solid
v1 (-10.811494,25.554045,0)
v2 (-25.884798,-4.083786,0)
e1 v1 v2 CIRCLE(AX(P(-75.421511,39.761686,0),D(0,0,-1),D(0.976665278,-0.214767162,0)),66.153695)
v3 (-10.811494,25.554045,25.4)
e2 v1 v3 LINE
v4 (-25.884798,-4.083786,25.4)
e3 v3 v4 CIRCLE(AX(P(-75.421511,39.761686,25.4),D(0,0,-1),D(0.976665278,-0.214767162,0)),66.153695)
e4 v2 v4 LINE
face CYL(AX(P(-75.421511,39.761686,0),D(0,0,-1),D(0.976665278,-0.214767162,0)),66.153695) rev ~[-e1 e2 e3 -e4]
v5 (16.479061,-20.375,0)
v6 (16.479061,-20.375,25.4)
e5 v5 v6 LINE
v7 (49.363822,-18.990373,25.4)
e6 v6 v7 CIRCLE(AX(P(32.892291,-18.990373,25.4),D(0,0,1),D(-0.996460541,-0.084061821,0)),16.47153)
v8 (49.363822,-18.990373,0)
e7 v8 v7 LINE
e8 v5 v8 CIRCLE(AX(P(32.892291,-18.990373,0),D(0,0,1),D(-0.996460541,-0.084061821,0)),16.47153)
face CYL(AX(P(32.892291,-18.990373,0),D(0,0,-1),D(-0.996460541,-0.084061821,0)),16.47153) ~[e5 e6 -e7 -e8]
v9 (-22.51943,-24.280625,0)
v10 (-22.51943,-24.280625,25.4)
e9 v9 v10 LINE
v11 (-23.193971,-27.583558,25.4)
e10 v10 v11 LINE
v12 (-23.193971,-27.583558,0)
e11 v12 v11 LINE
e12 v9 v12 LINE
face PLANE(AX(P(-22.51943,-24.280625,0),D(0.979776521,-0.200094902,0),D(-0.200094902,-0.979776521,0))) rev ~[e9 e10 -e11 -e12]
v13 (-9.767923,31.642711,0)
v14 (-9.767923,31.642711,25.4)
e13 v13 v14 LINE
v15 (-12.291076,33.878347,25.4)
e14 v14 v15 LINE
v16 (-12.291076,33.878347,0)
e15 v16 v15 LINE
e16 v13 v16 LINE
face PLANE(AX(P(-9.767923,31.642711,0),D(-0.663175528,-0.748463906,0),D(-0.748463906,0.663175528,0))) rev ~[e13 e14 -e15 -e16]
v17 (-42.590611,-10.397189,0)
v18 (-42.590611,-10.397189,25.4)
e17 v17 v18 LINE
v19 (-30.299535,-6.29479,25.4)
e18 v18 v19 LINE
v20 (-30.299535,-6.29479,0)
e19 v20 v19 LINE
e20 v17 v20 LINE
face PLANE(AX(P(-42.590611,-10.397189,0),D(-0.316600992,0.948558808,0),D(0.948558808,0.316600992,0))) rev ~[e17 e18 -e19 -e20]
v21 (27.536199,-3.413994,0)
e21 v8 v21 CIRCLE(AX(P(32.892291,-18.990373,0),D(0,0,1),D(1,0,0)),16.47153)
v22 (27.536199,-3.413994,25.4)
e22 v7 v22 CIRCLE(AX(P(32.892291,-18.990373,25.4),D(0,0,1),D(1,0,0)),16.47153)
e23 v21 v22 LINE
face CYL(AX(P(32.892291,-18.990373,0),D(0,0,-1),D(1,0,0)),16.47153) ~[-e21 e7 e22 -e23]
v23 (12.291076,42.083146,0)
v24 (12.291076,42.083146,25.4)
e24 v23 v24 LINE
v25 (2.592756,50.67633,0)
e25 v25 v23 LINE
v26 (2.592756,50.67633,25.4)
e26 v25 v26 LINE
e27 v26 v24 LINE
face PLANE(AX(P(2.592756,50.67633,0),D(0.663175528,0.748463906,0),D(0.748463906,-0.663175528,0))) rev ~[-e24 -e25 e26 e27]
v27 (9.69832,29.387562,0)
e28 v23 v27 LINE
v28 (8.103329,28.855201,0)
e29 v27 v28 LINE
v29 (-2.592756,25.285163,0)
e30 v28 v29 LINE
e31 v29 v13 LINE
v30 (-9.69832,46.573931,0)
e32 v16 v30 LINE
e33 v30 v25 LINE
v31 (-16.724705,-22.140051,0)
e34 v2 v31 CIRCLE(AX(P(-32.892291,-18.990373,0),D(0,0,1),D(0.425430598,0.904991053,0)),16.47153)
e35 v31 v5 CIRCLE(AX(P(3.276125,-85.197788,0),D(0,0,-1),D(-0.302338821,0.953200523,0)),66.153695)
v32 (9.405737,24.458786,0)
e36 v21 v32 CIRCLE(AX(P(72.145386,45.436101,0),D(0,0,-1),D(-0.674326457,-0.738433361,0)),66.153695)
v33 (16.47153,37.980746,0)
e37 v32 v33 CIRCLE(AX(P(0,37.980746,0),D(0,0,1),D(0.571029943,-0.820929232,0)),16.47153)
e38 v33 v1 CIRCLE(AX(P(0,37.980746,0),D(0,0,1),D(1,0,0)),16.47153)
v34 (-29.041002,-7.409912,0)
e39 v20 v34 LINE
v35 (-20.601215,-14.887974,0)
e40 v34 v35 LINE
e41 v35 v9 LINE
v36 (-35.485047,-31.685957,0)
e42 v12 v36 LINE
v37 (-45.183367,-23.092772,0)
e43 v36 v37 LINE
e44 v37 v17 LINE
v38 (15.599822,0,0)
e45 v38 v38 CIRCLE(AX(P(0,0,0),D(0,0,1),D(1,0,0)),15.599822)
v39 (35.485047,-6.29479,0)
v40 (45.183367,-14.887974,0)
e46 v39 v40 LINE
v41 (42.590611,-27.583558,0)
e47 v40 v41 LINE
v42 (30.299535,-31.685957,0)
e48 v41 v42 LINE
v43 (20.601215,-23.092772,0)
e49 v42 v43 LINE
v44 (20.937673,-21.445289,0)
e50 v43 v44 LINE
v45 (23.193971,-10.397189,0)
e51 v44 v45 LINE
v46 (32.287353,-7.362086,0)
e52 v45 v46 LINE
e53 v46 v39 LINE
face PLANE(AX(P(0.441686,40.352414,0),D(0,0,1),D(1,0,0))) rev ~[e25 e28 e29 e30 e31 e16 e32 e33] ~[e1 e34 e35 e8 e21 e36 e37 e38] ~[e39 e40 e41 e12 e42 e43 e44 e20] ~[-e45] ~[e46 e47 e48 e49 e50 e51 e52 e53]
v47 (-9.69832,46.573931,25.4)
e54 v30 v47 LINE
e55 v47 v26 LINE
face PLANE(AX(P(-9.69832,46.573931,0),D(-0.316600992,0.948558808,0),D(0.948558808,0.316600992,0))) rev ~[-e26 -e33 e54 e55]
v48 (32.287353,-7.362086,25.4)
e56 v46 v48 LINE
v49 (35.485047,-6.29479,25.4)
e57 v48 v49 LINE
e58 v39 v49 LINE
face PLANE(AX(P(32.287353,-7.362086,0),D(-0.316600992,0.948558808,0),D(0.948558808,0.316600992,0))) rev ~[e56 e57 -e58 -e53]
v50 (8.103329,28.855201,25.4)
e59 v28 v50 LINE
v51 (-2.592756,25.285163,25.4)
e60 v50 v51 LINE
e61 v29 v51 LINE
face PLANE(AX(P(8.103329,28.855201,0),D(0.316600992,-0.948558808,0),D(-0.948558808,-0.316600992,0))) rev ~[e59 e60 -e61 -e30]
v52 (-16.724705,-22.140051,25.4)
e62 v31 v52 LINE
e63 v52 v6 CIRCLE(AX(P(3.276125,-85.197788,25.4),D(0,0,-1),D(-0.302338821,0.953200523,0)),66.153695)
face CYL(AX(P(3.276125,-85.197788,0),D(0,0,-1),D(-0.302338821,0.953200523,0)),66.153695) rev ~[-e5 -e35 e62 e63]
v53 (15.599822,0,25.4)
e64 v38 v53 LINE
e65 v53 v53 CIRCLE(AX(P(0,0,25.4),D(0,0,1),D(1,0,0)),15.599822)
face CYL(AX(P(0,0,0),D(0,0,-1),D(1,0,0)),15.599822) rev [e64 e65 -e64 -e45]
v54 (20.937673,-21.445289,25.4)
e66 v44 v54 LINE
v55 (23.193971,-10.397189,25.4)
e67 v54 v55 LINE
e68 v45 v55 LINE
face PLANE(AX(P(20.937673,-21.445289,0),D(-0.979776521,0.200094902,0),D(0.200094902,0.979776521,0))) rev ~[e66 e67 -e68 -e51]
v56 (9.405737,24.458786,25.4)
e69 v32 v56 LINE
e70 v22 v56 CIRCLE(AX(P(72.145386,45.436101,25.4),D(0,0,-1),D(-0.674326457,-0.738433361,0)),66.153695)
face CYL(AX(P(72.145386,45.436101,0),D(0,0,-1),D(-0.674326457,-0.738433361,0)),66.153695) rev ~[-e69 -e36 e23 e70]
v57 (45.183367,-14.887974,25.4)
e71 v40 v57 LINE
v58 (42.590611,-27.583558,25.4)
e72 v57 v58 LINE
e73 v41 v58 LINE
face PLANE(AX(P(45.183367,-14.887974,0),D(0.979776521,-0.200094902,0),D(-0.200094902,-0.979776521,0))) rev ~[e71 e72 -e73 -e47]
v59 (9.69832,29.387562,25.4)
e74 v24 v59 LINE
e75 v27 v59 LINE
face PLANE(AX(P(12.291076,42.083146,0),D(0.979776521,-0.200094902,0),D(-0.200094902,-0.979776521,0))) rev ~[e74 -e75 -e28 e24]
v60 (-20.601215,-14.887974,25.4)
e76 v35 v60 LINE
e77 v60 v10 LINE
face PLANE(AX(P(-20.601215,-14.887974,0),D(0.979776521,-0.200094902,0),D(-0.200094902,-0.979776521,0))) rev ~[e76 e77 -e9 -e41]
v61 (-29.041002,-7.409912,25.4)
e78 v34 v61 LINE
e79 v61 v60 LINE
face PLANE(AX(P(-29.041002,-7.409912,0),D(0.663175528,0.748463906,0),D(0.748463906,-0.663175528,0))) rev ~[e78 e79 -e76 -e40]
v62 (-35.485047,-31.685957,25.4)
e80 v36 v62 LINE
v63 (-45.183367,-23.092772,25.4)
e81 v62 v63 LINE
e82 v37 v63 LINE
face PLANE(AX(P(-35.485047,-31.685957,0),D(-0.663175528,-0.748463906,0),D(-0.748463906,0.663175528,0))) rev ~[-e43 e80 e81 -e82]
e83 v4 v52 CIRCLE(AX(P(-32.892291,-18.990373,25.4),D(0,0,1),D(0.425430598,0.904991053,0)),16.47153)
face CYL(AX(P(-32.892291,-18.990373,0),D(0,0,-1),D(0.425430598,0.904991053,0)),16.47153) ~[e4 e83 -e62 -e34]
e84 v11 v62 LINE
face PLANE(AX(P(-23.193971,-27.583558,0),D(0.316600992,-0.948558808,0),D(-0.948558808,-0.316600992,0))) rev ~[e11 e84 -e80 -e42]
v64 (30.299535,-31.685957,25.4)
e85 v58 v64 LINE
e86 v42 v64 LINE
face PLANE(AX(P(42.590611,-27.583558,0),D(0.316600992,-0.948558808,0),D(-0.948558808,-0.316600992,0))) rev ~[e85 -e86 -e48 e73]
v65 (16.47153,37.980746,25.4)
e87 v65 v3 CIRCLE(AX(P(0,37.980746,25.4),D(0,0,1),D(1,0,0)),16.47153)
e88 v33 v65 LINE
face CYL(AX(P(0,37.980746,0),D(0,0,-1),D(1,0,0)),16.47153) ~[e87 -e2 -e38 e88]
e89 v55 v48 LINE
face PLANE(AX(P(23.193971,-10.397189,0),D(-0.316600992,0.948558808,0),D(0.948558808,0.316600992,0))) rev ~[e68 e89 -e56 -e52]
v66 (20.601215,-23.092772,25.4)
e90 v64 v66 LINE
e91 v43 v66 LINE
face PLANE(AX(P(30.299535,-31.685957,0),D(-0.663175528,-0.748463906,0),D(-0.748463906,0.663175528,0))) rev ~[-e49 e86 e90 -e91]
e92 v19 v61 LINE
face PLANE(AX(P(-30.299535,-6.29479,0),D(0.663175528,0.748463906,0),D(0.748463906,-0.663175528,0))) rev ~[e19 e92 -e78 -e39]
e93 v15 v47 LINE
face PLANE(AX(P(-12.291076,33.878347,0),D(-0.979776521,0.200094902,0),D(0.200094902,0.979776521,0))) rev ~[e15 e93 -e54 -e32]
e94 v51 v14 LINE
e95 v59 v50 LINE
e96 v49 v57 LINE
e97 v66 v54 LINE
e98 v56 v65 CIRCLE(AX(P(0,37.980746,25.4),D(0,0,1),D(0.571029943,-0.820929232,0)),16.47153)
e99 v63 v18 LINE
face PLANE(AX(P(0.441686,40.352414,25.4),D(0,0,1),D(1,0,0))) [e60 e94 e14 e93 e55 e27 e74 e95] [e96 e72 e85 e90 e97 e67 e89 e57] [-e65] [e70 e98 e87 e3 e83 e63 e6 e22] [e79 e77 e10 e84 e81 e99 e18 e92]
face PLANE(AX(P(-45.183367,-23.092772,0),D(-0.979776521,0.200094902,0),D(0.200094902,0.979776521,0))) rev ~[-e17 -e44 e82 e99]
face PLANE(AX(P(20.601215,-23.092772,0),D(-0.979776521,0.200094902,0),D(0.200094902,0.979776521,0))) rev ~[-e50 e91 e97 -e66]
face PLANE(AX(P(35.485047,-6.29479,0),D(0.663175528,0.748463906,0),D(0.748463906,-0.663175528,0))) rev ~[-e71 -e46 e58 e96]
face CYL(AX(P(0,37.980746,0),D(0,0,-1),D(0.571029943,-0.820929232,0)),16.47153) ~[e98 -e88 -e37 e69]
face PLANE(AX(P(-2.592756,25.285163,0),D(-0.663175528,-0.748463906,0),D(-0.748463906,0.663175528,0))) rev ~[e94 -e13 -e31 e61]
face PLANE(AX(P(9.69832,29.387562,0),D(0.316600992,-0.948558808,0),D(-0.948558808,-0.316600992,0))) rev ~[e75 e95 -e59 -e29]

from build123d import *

# Parameters (mm, degrees)
F0_R     = 15.5998218224
F1_DEPTH = 25.4


# Not quite as in the source:
# - a feature of the source that left no trace in its solid (it failed there, or was rolled back) is left out


with BuildPart() as f1:
    # F0 (on Top) → F1 (new body)
    with BuildSketch(Plane.XY):
        with BuildLine():
            Line((-9.7679234278, 31.6427110991), (-12.2910759721, 33.8783473239))
            Line((-12.2910759721, 33.8783473239), (-9.6983198699, 46.5739309325))
            Line((-9.6983198699, 46.5739309325), (2.5927561023, 50.6763300865))
            Line((2.5927561023, 50.6763300865), (12.2910759721, 42.0831456318))
            Line((12.2910759721, 42.0831456318), (9.6983198699, 29.3875620231))
            Line((9.6983198699, 29.3875620231), (8.1033290175, 28.8552010534))
            ThreePointArc((8.1033290175, 28.8552010534), (8.7164308394, 26.6457057993), (9.4057371171, 24.4587855955))
            ThreePointArc((9.4057371171, 24.4587855955), (14.5985992918, 30.3523642419), (16.4715304941, 37.9807464778))
            ThreePointArc((16.4715304941, 37.9807464778), (-6.8274979981, 52.9706293294), (-10.8114943571, 25.5540451221))
            ThreePointArc((-10.8114943571, 25.5540451221), (-10.2185999519, 28.5861903467), (-9.7679234278, 31.6427110991))
        make_face()
        with BuildLine():
            Line((-2.5927561023, 25.2851628692), (-9.7679234278, 31.6427110991))
            ThreePointArc((-9.7679234278, 31.6427110991), (-10.2185999519, 28.5861903467), (-10.8114943571, 25.5540451221))
            ThreePointArc((-10.8114943571, 25.5540451221), (-0.8910312632, 21.5333339121), (9.4057371171, 24.4587855955))
            ThreePointArc((9.4057371171, 24.4587855955), (8.7164308394, 26.6457057993), (8.1033290175, 28.8552010534))
            Line((8.1033290175, 28.8552010534), (-2.5927561023, 25.2851628692))
        make_face()
        with BuildLine():
            ThreePointArc((9.4057371171, 24.4587855955), (-0.8910312632, 21.5333339121), (-10.8114943571, 25.5540451221))
            ThreePointArc((-10.8114943571, 25.5540451221), (-16.4556801257, 9.772653233), (-25.88479823, -4.083785513))
            ThreePointArc((-25.88479823, -4.083785513), (-27.4340735437, -5.7742023624), (-29.0410016523, -7.4099117424))
            Line((-29.0410016523, -7.4099117424), (-20.6012153324, -14.887974085))
            Line((-20.6012153324, -14.887974085), (-22.5194299425, -24.2806253802))
            ThreePointArc((-22.5194299425, -24.2806253802), (-19.6470670617, -23.1426623228), (-16.7247050666, -22.1400513271))
            ThreePointArc((-16.7247050666, -22.1400513271), (-0.2355258993, -19.1373636419), (16.4790611129, -20.3750000825))
            ThreePointArc((16.4790611129, -20.3750000825), (19.0939298277, -9.9950112466), (27.5361994237, -3.4139937949))
            ThreePointArc((27.5361994237, -3.4139937949), (16.691206025, 9.3647104089), (9.4057371171, 24.4587855955))
        make_face()
        Circle(F0_R, mode=Mode.SUBTRACT)
        with BuildLine():
            ThreePointArc((-29.0410016523, -7.4099117424), (-27.4340735437, -5.7742023624), (-25.88479823, -4.083785513))
            ThreePointArc((-25.88479823, -4.083785513), (-47.5816840445, -26.4424238123), (-16.7247050666, -22.1400513271))
            ThreePointArc((-16.7247050666, -22.1400513271), (-19.6470670617, -23.1426623228), (-22.5194299425, -24.2806253802))
            Line((-22.5194299425, -24.2806253802), (-23.1939714347, -27.5835576936))
            Line((-23.1939714347, -27.5835576936), (-35.4850474068, -31.6859568476))
            Line((-35.4850474068, -31.6859568476), (-45.1833672766, -23.0927723929))
            Line((-45.1833672766, -23.0927723929), (-42.5906111744, -10.3971887842))
            Line((-42.5906111744, -10.3971887842), (-30.2995352023, -6.2947896303))
            Line((-30.2995352023, -6.2947896303), (-29.0410016523, -7.4099117424))
        make_face()
        with BuildLine():
            ThreePointArc((49.3638217986, -18.9903732389), (42.4601616546, -5.5826451025), (27.5361994237, -3.4139937949))
            ThreePointArc((27.5361994237, -3.4139937949), (29.8656670136, -5.4435280239), (32.2873533703, -7.3620857189))
            Line((32.2873533703, -7.3620857189), (35.4850474068, -6.2947896303))
            Line((35.4850474068, -6.2947896303), (45.1833672766, -14.887974085))
            Line((45.1833672766, -14.887974085), (42.5906111744, -27.5835576936))
            Line((42.5906111744, -27.5835576936), (30.2995352023, -31.6859568476))
            Line((30.2995352023, -31.6859568476), (20.6012153324, -23.0927723929))
            Line((20.6012153324, -23.0927723929), (20.9376726348, -21.4452893111))
            ThreePointArc((20.9376726348, -21.4452893111), (18.7176427043, -20.8715034369), (16.4790611129, -20.3750000825))
            ThreePointArc((16.4790611129, -20.3750000825), (33.5852181443, -35.4473222032), (49.3638217986, -18.9903732389))
        make_face()
        with BuildLine():
            ThreePointArc((32.2873533703, -7.3620857189), (29.8656670136, -5.4435280239), (27.5361994237, -3.4139937949))
            ThreePointArc((27.5361994237, -3.4139937949), (19.0939298277, -9.9950112466), (16.4790611129, -20.3750000825))
            ThreePointArc((16.4790611129, -20.3750000825), (18.7176427043, -20.8715034369), (20.9376726348, -21.4452893111))
            Line((20.9376726348, -21.4452893111), (23.1939714347, -10.3971887842))
            Line((23.1939714347, -10.3971887842), (32.2873533703, -7.3620857189))
        make_face()
    extrude(amount=F1_DEPTH)


solid = f1.part
